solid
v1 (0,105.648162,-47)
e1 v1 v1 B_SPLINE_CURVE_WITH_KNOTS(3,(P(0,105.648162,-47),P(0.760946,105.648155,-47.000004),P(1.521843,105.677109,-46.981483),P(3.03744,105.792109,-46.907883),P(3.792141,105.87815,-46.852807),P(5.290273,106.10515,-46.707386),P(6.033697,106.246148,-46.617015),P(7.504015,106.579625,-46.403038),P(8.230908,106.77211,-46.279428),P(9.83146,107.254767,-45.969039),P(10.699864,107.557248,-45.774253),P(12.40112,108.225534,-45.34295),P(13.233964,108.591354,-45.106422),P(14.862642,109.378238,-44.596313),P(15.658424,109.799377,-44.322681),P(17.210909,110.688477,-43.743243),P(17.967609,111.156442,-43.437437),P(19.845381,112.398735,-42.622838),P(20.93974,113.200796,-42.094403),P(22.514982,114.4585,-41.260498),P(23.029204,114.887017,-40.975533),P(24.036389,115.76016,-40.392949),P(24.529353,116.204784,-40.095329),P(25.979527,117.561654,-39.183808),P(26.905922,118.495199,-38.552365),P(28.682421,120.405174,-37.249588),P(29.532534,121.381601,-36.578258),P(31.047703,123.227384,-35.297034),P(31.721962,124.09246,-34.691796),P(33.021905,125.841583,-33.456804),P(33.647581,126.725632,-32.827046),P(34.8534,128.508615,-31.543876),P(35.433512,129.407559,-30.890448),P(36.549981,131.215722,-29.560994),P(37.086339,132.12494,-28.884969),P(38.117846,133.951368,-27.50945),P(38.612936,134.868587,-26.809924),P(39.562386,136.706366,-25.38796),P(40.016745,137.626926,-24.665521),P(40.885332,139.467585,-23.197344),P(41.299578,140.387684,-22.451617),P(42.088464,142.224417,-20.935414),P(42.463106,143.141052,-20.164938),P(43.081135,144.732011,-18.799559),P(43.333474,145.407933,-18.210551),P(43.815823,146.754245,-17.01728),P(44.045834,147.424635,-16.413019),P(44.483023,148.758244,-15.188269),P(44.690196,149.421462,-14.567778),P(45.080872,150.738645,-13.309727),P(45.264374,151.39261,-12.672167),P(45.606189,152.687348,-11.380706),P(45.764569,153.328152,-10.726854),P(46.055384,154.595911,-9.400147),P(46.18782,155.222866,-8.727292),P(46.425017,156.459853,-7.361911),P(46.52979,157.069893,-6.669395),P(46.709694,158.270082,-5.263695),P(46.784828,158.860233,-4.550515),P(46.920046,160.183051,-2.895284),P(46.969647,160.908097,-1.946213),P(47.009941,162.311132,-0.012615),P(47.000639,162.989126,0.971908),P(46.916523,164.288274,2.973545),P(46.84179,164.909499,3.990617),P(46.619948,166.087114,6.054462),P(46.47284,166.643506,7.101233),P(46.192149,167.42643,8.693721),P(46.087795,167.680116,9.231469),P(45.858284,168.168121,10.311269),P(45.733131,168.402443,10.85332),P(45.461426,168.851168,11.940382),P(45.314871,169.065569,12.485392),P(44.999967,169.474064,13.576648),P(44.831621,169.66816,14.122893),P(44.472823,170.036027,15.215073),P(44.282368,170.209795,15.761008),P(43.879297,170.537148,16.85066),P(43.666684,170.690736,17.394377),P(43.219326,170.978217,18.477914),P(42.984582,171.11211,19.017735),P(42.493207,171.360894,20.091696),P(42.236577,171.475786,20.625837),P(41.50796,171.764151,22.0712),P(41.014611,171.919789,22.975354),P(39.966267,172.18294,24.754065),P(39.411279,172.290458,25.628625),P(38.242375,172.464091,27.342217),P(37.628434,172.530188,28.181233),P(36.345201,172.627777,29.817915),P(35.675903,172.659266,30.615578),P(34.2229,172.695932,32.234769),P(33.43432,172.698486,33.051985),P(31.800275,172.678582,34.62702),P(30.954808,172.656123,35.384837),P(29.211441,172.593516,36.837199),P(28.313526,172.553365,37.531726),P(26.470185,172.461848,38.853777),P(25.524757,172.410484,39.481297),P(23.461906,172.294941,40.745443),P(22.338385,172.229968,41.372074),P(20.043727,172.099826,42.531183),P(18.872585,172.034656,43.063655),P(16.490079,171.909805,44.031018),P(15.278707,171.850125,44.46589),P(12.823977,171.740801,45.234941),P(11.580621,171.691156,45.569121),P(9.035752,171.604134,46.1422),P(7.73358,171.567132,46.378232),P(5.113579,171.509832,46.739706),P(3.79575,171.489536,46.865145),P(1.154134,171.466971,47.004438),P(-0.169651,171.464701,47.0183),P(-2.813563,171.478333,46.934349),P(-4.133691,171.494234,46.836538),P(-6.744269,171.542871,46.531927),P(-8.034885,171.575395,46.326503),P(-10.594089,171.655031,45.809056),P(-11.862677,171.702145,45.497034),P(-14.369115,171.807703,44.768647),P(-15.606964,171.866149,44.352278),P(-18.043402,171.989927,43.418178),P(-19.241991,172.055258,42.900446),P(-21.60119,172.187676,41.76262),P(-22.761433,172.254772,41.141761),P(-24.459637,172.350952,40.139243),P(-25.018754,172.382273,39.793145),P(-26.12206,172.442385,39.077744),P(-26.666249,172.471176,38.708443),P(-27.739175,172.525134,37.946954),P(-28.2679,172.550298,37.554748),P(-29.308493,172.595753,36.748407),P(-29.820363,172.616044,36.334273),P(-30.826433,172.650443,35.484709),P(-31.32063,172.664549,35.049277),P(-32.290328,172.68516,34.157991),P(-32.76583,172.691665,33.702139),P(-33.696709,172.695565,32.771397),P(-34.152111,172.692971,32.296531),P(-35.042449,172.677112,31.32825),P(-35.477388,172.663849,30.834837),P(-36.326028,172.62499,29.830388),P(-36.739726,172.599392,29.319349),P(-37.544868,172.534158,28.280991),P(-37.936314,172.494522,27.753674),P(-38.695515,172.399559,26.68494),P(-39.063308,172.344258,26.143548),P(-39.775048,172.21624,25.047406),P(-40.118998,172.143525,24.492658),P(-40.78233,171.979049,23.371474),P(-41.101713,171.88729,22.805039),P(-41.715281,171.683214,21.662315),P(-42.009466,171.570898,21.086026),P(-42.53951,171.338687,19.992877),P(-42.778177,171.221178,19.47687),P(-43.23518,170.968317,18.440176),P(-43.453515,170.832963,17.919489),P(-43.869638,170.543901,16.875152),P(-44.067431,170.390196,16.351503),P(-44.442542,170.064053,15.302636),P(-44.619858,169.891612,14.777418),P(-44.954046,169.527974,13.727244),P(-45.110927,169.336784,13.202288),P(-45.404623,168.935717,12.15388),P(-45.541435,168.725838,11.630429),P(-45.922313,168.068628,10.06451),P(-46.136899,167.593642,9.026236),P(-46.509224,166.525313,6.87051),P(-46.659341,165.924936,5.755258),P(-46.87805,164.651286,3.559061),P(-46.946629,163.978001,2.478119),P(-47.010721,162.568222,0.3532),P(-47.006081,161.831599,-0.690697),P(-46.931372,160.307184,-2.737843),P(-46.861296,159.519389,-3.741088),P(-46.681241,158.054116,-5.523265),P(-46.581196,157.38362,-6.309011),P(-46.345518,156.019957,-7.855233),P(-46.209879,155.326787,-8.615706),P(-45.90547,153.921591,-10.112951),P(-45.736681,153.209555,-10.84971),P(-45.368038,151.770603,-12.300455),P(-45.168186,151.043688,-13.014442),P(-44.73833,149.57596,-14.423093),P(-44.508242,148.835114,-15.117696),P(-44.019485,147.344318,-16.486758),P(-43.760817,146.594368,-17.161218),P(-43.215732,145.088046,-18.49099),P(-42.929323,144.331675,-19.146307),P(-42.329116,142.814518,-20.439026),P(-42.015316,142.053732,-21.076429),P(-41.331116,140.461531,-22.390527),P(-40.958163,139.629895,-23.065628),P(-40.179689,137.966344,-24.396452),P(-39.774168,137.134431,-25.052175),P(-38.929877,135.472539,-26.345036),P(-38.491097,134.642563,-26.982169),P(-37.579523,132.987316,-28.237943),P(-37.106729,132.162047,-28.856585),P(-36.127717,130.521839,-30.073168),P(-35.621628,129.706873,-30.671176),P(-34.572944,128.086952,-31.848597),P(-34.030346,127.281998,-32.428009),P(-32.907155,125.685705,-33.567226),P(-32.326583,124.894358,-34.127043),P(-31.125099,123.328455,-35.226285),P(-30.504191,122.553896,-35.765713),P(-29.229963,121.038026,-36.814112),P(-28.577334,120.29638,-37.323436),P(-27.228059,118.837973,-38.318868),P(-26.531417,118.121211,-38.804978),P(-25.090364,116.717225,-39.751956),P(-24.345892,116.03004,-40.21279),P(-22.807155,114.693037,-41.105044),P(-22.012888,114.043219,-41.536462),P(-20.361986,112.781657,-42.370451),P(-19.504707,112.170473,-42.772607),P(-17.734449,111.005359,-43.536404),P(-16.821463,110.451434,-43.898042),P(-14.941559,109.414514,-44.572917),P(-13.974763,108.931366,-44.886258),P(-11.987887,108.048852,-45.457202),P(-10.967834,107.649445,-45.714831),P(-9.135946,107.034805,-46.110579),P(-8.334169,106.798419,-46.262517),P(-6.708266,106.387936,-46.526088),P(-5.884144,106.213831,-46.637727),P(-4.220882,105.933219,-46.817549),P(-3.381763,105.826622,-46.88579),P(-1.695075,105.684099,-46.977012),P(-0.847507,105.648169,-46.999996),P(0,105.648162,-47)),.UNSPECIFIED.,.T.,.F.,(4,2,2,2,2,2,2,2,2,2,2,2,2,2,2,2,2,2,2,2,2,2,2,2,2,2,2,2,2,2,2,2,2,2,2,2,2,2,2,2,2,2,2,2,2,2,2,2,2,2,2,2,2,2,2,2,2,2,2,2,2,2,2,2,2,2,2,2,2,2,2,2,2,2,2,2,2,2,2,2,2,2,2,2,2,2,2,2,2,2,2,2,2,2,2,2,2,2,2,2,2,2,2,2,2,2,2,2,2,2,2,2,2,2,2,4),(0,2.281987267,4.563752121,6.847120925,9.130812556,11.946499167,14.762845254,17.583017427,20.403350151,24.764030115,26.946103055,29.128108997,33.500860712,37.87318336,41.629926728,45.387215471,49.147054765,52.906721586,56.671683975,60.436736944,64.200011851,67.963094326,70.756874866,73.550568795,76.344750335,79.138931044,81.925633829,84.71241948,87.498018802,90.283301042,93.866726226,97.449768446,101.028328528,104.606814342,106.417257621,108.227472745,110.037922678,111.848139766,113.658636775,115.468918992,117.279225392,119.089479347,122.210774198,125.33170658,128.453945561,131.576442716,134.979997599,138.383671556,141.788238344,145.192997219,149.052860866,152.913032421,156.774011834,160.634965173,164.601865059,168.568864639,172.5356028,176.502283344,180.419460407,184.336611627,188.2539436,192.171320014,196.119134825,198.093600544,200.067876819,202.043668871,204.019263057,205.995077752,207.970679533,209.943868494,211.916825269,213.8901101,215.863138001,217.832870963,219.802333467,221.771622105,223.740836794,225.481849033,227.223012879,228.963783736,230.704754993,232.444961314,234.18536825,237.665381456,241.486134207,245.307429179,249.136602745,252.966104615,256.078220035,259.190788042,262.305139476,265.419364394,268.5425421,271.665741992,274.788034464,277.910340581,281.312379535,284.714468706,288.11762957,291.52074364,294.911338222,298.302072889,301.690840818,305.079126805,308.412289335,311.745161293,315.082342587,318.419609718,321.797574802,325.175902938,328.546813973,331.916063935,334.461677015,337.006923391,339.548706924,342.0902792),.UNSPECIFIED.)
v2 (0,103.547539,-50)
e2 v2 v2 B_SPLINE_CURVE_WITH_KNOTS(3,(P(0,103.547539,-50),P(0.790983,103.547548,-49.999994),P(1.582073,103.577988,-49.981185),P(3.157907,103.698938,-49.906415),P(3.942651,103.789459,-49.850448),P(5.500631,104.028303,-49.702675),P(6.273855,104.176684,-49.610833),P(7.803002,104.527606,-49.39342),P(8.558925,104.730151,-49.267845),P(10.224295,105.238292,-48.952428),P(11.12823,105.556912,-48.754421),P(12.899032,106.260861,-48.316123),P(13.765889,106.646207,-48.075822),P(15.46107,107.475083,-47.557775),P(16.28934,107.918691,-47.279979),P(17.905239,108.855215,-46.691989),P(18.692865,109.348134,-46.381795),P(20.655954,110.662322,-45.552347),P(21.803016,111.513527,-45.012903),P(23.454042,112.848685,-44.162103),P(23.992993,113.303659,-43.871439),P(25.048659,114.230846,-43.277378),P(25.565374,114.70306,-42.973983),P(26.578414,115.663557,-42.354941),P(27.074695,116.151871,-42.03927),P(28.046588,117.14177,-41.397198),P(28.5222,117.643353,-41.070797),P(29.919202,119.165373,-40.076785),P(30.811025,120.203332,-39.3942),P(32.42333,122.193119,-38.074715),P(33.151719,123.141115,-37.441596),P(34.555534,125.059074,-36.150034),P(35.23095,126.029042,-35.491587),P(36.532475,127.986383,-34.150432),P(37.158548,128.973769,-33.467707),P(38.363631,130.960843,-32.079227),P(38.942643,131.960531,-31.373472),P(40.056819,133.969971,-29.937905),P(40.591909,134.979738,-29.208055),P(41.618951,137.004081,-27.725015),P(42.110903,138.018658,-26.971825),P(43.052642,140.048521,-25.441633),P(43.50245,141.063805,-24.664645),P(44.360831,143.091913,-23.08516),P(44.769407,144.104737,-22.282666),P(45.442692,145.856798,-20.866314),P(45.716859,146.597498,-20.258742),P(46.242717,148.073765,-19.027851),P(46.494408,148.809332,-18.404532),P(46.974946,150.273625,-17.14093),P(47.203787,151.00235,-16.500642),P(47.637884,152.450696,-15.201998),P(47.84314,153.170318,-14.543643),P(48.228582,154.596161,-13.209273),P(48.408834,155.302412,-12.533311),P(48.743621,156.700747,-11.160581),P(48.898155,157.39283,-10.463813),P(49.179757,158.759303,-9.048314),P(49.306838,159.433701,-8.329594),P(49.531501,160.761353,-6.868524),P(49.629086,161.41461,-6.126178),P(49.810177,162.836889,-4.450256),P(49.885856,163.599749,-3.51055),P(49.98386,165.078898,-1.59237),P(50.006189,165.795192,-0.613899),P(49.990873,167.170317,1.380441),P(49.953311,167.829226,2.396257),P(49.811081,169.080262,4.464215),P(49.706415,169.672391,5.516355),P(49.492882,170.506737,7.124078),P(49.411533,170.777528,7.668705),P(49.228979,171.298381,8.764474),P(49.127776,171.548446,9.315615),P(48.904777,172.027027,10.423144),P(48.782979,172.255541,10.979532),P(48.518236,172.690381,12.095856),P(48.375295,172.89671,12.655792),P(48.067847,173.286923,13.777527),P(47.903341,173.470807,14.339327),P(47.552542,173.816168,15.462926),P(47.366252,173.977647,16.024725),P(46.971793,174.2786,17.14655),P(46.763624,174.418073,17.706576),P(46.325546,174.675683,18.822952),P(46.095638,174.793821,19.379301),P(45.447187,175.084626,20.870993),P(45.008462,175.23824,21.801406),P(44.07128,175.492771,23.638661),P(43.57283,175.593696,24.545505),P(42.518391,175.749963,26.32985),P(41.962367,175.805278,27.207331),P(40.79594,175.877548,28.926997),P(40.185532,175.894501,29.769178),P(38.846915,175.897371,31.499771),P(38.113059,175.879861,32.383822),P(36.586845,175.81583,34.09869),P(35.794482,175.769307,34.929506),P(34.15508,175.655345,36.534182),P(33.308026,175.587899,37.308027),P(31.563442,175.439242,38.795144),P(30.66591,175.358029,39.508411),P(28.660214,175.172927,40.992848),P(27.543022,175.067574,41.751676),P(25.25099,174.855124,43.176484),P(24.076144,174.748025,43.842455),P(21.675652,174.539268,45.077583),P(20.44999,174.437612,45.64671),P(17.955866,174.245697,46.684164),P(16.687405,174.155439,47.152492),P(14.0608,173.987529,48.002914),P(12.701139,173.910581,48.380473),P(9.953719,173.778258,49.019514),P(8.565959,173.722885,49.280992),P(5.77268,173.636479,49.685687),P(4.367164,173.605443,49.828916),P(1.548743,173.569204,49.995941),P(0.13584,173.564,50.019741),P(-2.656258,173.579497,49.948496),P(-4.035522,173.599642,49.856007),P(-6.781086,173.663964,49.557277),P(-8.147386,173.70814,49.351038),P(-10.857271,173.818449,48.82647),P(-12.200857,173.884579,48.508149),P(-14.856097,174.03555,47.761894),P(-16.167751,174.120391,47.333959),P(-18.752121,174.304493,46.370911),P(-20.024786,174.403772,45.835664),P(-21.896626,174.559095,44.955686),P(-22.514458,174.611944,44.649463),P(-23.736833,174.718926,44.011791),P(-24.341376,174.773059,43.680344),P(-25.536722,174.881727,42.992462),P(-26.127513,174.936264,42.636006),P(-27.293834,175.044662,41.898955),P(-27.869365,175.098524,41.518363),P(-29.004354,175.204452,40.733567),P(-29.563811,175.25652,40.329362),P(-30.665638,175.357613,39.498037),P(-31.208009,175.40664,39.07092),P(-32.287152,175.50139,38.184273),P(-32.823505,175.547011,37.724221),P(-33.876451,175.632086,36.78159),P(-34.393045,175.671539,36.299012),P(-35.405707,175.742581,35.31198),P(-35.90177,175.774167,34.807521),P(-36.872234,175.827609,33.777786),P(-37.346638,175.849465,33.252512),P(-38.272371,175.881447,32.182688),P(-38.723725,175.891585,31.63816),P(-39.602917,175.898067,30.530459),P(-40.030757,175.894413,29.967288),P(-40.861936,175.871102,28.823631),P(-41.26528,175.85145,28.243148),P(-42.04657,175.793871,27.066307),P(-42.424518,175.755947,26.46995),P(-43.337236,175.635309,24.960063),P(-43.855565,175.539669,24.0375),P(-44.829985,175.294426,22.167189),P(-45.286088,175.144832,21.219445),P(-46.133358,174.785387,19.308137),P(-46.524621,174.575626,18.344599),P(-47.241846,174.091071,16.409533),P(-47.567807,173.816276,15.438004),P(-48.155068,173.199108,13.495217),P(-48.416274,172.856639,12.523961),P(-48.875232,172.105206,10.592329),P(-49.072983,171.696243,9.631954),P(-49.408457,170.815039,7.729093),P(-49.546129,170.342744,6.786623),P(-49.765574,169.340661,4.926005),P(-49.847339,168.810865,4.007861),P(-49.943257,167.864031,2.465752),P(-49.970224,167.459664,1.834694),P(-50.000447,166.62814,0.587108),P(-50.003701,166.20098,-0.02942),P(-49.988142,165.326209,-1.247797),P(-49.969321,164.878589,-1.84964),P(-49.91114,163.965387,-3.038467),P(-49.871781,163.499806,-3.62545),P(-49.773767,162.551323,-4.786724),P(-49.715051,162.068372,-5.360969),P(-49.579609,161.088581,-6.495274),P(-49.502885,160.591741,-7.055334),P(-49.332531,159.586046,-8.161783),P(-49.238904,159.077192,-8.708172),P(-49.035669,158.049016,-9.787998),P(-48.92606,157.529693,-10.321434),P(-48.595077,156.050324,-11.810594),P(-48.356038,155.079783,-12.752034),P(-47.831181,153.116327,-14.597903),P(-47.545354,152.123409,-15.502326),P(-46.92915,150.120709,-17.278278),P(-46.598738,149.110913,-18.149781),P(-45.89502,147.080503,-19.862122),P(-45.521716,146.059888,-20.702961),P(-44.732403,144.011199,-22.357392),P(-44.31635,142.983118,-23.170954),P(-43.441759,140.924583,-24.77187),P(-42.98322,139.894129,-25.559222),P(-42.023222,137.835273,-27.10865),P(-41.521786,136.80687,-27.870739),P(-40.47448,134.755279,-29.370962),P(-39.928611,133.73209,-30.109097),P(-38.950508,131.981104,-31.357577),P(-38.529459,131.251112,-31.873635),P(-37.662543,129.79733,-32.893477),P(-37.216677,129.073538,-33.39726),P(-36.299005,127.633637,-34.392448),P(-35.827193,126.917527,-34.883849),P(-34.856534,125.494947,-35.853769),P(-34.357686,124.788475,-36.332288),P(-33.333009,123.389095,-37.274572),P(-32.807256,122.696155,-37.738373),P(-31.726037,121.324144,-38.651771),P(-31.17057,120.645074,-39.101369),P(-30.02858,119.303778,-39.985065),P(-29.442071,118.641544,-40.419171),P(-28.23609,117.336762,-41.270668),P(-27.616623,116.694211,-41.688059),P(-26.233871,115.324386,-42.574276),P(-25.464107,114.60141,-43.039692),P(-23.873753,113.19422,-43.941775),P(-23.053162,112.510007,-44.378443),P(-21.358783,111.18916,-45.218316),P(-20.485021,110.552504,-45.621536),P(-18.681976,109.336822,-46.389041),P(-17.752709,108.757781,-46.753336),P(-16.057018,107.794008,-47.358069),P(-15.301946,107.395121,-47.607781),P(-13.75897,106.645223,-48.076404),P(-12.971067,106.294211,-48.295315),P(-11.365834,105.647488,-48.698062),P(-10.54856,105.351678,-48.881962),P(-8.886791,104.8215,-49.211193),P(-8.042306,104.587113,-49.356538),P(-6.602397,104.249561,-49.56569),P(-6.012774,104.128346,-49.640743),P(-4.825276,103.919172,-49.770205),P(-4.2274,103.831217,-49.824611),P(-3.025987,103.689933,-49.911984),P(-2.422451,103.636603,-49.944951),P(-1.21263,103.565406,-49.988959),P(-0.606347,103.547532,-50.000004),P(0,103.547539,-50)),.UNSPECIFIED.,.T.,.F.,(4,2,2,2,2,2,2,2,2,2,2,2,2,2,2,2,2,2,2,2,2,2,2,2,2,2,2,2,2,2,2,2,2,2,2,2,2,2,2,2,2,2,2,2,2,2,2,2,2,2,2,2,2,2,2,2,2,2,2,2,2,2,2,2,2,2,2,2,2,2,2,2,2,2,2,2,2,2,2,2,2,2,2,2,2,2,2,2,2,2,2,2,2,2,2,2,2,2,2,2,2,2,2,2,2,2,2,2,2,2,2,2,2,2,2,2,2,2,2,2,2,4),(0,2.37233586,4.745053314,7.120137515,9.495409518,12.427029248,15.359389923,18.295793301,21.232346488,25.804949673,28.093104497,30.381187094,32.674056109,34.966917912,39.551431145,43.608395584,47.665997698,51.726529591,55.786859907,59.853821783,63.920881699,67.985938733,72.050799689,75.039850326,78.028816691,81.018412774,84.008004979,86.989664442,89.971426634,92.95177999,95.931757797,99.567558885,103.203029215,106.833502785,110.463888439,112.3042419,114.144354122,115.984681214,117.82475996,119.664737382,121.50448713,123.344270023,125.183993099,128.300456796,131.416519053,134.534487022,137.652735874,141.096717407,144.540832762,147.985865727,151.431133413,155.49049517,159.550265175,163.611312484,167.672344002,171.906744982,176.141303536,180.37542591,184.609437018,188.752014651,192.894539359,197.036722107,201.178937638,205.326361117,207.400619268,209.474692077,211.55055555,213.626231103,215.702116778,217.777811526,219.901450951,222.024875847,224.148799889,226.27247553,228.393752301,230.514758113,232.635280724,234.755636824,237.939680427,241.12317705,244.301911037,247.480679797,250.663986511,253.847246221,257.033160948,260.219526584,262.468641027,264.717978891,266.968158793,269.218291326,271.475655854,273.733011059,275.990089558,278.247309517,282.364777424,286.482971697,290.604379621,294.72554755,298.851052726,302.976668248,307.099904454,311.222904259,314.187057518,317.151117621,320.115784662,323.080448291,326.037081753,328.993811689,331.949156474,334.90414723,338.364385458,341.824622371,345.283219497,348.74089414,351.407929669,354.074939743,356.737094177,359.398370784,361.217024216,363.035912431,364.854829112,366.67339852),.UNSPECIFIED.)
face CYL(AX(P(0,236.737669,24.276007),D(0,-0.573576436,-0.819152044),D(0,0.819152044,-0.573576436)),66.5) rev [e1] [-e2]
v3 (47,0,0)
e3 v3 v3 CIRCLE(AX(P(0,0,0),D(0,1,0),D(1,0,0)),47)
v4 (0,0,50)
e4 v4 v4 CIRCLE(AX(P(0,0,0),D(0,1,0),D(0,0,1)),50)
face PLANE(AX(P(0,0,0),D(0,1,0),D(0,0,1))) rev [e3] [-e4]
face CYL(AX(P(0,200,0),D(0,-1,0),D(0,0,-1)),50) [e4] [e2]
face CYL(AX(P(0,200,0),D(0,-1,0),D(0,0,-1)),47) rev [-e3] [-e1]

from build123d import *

# Parameters (mm, degrees)
EXTRUDE_1_OUTLINE_R      = 50
EXTRUDE_1_OUTLINE_R_2    = 47
EXTRUDE_1_DEPTH          = 200
CUT_EXTRUDE_1_DEPTH      = 213.132034356
CUT_EXTRUDE_1_DEPTH_BACK = 213.132034356
SKETCH_2_R               = 66.5


# Read off the part's stored shape, not the designer's step: Вытянуть-Тонкостенный1
with BuildPart() as part:
    # Вытянуть-Тонкостенный1 outline → Вытянуть-Тонкостенный1 (new body)
    with BuildSketch(Plane(origin=(0, 0, 0), x_dir=(1, 0, 0), z_dir=(0, 1, 0))):
        Circle(EXTRUDE_1_OUTLINE_R)
        Circle(EXTRUDE_1_OUTLINE_R_2, mode=Mode.SUBTRACT)
    extrude(amount=EXTRUDE_1_DEPTH)

    # Эскиз2 → Вырез-Вытянуть1 (cut, two sides: drawn at the far end of the back side and taken through both)
    with BuildSketch(Plane(origin=(0, 0, 0), x_dir=(1, 0, 0), z_dir=(0, -0.5735764363510444, -0.819152044288993)).offset(-CUT_EXTRUDE_1_DEPTH_BACK)):
        with Locations((0, -180)):
            Circle(SKETCH_2_R)
    extrude(amount=CUT_EXTRUDE_1_DEPTH + CUT_EXTRUDE_1_DEPTH_BACK, mode=Mode.SUBTRACT)


solid = part.part
